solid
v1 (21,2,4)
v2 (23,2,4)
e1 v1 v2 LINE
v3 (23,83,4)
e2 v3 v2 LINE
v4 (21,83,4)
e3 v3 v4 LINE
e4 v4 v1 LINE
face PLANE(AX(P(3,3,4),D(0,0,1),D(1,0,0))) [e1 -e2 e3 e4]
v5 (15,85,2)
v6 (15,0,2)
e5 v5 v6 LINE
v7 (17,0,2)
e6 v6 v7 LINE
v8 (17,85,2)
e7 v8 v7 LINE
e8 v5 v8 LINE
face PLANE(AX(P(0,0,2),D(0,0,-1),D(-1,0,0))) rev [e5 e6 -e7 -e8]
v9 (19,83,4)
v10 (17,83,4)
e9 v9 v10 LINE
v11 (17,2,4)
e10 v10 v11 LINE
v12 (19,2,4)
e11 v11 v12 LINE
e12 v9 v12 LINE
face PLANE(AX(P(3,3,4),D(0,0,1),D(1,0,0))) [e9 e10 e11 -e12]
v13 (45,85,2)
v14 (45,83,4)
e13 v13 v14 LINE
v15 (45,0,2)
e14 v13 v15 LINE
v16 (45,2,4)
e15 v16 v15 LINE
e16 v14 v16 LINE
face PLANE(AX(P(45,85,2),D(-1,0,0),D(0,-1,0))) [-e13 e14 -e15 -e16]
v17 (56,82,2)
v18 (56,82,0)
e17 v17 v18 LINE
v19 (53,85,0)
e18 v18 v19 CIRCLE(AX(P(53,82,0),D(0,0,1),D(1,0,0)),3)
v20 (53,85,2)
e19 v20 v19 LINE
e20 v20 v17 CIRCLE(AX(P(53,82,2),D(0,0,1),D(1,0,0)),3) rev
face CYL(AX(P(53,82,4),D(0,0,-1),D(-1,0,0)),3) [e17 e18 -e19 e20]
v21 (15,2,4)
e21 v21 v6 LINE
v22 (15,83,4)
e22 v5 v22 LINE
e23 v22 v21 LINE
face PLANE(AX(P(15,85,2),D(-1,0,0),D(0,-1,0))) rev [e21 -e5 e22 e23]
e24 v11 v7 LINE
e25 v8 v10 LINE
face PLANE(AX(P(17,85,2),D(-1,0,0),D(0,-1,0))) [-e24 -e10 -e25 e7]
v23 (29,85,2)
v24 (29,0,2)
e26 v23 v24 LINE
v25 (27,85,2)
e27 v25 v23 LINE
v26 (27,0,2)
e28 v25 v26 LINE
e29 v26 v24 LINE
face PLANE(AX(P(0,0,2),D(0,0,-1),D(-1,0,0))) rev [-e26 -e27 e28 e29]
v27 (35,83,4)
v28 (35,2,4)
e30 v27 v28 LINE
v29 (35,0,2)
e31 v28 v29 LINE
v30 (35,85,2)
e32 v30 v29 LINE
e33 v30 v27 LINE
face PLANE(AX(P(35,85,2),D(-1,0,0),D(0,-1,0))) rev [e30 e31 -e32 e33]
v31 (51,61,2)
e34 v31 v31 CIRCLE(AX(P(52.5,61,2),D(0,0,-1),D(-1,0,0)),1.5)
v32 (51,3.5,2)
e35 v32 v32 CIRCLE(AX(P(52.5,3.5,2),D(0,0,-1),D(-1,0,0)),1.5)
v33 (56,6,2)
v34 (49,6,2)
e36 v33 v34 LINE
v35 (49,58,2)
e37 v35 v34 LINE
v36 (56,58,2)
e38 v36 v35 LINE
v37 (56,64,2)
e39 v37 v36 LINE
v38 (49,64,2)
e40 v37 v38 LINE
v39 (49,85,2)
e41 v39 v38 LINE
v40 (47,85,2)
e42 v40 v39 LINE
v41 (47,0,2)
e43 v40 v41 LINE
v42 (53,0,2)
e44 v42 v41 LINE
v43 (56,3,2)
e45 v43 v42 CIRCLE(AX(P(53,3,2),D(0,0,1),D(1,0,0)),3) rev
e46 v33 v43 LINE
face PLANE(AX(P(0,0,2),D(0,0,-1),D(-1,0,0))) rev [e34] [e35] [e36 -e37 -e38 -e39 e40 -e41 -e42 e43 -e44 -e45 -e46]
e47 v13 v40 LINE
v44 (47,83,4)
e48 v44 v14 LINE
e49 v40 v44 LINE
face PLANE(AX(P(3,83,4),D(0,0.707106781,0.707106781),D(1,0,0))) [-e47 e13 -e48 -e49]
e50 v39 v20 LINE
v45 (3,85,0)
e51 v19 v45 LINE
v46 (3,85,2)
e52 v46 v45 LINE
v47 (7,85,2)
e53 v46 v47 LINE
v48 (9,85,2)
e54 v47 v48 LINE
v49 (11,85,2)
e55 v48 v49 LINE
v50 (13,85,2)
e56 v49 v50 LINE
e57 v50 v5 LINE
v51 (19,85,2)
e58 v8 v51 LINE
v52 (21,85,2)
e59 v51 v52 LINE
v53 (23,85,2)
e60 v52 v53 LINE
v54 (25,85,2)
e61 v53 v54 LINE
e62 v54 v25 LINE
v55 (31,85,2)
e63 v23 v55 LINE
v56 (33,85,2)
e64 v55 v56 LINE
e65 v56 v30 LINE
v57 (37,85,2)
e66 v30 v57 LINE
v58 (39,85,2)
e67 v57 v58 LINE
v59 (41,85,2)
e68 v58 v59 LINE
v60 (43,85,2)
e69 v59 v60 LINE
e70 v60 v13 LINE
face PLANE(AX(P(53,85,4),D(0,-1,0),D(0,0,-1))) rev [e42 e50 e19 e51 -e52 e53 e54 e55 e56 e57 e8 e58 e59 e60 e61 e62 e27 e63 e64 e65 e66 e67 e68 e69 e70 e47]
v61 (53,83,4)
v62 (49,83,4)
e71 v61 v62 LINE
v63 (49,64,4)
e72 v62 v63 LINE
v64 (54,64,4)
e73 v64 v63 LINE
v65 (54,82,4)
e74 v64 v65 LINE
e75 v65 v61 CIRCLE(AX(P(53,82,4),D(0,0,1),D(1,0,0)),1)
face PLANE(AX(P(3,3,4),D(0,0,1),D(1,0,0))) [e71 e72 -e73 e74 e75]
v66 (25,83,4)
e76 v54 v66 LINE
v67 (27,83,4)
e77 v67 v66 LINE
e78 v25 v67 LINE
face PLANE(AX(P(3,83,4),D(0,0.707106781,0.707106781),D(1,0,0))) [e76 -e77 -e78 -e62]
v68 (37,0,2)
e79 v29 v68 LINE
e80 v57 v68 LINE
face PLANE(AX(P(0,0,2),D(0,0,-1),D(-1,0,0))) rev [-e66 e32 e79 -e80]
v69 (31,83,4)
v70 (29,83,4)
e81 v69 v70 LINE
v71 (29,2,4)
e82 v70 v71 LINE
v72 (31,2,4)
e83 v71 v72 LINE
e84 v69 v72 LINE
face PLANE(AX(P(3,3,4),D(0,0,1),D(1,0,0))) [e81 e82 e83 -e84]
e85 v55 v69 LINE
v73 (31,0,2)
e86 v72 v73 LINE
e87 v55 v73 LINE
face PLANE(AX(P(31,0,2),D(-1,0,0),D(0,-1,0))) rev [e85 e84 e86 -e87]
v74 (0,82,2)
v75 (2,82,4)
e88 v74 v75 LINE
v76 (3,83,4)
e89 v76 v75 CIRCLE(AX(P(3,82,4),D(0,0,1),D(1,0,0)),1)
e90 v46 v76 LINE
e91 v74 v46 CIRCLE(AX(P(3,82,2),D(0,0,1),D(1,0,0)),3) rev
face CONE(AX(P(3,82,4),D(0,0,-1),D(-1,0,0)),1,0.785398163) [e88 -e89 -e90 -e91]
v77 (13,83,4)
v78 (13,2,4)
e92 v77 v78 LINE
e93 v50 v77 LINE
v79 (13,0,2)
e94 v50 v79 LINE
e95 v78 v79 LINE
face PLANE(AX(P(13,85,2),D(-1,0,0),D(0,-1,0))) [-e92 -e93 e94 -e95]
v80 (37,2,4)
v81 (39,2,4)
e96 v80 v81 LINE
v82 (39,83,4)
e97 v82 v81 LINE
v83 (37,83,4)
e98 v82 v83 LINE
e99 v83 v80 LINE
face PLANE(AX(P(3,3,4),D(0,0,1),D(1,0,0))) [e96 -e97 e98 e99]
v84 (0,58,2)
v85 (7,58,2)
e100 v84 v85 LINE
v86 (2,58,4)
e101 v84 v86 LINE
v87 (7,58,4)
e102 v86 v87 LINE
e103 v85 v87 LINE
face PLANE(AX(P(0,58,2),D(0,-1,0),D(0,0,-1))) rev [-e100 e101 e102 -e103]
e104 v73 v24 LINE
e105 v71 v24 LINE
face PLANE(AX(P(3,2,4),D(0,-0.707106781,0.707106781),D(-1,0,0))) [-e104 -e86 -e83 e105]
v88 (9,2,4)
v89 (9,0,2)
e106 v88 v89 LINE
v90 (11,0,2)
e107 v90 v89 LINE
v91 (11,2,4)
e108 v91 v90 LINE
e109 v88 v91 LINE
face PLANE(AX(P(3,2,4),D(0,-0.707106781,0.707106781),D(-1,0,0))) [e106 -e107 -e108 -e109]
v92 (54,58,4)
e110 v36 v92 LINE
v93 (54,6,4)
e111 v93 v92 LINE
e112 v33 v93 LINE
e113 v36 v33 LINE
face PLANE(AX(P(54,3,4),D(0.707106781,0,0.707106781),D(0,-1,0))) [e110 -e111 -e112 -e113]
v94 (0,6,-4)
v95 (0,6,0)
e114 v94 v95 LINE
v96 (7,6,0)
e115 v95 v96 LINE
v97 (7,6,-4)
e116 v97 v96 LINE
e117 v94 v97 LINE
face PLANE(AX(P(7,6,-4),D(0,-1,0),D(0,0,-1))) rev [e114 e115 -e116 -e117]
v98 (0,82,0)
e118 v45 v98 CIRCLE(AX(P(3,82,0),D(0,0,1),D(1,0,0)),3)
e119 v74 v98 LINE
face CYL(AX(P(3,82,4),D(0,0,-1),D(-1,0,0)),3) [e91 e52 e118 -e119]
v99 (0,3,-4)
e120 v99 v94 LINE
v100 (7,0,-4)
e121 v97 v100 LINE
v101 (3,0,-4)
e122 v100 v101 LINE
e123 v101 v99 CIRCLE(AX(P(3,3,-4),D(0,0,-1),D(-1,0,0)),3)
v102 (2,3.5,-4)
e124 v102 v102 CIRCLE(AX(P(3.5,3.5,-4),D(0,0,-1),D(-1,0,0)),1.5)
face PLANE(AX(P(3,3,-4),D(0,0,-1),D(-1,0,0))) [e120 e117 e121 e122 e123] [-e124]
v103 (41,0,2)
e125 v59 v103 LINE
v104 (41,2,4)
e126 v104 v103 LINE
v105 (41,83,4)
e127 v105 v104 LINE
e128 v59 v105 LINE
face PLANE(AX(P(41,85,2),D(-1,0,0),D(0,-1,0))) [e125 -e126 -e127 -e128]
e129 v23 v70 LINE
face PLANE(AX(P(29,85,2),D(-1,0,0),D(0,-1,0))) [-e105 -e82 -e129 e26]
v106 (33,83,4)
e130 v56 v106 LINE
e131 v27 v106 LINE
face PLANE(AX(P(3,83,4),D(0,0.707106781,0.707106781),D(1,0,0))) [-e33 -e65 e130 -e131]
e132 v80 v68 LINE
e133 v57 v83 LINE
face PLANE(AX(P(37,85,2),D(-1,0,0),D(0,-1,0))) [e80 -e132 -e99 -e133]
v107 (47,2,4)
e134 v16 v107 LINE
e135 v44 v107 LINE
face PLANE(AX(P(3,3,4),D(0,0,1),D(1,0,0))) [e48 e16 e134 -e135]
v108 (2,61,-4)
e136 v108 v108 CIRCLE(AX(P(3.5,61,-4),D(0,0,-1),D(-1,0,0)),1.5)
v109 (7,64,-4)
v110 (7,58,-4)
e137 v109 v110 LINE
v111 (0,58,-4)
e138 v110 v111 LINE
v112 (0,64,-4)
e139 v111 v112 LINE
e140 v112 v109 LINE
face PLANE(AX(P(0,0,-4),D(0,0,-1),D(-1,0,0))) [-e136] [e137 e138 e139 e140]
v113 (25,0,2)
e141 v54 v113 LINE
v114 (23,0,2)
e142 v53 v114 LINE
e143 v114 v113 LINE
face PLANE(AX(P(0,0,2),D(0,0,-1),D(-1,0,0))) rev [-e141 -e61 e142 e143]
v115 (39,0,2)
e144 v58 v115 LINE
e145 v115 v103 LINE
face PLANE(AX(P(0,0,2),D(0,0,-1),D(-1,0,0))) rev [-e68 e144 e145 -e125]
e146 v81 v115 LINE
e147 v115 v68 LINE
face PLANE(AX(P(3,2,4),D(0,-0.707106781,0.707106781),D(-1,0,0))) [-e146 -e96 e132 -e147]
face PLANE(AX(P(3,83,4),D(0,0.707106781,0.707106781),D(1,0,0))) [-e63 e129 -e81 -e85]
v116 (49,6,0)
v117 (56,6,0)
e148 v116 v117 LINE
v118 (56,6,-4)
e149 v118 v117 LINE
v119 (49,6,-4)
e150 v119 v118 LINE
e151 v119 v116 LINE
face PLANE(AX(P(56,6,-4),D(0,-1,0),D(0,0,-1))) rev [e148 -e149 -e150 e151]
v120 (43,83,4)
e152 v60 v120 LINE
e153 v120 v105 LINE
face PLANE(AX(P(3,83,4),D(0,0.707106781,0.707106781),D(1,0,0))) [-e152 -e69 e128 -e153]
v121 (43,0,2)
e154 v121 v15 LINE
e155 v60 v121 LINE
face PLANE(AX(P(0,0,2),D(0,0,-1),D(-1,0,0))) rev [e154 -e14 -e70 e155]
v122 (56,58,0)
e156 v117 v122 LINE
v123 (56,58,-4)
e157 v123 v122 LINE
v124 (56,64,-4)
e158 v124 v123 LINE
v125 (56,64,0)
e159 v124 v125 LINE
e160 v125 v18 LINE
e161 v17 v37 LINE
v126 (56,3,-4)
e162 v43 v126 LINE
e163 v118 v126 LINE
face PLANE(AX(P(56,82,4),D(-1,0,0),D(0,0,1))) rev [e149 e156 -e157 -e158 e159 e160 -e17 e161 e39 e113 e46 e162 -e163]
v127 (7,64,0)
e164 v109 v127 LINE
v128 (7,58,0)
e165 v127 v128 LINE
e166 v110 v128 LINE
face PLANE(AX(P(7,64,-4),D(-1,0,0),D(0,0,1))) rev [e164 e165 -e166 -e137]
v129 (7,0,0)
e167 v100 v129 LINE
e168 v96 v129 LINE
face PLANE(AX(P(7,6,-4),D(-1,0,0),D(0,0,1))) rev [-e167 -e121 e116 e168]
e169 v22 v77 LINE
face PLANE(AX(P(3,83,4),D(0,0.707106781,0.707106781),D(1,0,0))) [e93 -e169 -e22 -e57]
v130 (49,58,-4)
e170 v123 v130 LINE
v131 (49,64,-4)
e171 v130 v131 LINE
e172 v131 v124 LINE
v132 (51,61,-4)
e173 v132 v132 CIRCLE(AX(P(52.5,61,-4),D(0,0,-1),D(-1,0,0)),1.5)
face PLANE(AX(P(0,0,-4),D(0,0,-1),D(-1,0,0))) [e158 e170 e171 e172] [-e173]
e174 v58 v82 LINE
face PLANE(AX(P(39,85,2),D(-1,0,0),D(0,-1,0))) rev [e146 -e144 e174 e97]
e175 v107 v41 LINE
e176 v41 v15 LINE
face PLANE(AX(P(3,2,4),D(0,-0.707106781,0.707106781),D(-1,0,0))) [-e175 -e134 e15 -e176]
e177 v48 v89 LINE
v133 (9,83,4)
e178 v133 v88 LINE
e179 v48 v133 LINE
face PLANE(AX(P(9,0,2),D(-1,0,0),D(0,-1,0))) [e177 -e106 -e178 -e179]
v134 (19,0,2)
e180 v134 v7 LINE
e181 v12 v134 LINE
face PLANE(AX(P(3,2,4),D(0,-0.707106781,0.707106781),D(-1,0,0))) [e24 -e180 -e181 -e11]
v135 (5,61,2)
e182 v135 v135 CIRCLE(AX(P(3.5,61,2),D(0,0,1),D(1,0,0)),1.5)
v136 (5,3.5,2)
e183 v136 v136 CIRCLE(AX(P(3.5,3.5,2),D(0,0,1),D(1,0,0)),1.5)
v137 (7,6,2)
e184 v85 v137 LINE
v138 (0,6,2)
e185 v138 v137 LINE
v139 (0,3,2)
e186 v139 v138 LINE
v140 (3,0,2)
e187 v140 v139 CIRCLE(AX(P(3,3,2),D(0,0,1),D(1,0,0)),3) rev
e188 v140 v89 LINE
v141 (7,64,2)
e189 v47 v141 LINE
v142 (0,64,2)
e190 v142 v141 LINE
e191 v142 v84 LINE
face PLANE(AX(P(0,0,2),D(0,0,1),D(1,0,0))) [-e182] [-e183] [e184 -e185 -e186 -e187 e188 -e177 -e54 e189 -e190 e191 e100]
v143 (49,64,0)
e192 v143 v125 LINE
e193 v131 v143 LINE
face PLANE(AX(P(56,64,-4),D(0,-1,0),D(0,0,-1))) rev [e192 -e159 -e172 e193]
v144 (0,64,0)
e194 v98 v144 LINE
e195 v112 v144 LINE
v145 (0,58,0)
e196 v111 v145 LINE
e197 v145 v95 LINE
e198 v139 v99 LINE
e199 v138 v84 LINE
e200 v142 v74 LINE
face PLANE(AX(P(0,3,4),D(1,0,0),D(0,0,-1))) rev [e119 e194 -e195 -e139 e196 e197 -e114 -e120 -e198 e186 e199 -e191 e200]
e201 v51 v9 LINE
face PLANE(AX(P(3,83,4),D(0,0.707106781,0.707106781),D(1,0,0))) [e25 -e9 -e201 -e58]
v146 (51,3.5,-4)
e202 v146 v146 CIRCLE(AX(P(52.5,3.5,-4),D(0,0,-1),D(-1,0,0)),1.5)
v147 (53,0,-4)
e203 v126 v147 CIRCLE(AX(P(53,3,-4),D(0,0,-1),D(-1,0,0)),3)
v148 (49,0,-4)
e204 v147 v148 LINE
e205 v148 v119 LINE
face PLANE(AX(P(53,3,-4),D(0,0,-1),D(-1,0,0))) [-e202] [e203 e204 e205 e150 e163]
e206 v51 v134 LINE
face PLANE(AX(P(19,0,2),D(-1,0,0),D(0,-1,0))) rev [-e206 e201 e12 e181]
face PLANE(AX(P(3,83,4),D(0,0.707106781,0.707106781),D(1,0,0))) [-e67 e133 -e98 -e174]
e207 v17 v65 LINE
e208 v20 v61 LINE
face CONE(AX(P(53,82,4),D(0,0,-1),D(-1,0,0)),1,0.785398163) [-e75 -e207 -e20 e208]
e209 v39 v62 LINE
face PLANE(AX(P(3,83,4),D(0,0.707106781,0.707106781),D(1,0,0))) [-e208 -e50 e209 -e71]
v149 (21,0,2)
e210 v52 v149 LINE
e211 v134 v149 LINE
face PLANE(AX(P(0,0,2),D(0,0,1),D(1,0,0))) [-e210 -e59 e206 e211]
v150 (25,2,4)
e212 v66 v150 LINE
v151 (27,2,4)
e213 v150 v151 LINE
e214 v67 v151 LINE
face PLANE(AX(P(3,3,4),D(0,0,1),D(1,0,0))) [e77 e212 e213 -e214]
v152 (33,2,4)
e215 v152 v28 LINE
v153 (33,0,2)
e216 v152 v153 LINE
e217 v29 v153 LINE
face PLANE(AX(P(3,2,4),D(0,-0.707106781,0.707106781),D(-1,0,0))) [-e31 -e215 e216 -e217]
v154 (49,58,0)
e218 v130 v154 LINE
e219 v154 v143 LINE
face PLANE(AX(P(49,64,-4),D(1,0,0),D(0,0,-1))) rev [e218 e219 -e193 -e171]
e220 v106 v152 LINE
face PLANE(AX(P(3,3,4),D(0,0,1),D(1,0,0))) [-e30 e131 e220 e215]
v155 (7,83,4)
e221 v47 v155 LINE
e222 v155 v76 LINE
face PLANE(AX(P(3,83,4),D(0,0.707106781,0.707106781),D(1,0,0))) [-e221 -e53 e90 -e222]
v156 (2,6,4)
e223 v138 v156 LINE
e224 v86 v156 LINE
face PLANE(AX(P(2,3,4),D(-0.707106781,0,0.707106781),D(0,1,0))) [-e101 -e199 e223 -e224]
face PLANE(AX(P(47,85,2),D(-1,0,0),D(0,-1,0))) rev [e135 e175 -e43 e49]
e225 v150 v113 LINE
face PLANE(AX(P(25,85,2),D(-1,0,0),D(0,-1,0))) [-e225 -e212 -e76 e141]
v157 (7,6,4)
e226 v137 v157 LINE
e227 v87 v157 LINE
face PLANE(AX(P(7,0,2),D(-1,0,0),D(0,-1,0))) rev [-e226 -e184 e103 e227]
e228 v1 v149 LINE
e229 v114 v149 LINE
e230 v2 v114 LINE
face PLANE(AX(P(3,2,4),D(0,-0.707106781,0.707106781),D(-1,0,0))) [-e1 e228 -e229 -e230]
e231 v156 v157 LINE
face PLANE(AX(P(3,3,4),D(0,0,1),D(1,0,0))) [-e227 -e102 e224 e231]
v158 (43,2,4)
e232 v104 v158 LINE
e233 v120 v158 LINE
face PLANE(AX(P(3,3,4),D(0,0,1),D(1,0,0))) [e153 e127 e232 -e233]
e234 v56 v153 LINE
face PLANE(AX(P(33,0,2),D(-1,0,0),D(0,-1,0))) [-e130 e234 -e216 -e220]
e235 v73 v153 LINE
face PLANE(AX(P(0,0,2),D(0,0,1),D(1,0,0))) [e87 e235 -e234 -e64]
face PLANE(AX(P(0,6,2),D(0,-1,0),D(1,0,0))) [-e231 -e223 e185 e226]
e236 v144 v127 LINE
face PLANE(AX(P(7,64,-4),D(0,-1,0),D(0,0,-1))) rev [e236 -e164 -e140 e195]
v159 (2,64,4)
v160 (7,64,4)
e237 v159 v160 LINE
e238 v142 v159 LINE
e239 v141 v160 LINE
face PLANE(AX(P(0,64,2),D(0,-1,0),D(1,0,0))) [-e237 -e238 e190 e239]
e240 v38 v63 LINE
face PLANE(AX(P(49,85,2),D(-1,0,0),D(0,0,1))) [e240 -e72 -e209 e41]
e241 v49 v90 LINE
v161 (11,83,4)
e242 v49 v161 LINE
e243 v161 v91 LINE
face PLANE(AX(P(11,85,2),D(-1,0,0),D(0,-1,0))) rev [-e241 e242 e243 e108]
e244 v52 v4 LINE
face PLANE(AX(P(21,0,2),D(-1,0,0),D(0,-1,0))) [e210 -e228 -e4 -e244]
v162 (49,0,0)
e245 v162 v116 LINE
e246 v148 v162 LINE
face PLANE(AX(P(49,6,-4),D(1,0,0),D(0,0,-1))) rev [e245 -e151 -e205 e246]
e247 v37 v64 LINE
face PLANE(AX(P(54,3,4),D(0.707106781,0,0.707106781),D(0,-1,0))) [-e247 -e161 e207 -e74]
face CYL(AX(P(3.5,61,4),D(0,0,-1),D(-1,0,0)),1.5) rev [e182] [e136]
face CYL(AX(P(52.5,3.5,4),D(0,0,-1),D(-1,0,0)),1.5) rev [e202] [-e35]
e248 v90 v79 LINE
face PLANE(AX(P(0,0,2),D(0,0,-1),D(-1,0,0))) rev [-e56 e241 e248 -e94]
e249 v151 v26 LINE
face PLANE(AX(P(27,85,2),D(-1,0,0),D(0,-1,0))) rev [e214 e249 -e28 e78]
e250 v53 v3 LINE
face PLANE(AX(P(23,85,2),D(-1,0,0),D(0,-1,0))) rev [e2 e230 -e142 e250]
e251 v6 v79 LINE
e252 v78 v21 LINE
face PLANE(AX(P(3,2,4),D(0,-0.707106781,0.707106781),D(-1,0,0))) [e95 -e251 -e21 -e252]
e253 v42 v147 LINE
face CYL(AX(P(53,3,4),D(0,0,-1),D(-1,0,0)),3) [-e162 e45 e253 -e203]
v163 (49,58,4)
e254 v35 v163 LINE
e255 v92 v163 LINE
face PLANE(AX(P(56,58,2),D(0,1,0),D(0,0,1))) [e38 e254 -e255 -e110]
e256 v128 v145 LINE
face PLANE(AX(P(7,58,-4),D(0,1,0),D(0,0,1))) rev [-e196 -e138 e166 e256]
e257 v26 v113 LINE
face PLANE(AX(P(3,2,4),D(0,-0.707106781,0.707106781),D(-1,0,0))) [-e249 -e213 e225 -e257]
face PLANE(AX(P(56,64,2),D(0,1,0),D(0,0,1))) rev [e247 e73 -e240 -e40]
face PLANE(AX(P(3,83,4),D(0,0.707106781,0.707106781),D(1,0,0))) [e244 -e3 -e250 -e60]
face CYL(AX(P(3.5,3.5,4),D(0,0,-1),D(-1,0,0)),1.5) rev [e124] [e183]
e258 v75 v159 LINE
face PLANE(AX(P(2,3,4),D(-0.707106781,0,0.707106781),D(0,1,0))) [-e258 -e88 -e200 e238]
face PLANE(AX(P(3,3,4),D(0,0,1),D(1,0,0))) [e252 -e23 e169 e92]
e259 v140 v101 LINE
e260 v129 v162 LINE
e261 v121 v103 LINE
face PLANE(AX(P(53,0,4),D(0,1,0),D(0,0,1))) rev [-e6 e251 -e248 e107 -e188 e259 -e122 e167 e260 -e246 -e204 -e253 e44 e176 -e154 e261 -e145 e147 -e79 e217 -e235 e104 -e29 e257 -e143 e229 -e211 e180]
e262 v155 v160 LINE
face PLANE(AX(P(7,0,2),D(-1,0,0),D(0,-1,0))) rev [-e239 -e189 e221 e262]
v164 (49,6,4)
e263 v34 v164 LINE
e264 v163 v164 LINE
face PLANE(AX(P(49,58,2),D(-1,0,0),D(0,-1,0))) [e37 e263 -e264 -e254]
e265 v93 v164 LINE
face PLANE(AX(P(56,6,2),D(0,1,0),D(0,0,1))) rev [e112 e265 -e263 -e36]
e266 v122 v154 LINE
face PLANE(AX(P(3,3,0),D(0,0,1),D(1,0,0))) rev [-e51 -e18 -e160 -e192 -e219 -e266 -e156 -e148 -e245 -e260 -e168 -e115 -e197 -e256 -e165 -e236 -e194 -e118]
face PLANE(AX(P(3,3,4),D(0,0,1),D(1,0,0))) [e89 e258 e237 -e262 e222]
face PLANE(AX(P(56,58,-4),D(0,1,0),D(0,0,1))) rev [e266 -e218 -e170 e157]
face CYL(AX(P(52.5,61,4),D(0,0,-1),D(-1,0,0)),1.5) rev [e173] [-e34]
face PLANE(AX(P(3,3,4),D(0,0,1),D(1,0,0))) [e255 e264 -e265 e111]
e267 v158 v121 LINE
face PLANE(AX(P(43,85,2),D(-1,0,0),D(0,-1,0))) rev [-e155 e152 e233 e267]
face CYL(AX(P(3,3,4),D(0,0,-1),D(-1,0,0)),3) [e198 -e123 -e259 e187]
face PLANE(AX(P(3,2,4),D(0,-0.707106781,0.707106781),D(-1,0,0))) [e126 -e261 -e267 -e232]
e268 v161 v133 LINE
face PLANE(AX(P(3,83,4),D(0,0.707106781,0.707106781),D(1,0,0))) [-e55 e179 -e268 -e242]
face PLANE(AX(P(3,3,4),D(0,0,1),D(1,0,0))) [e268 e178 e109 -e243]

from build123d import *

# Parameters (mm, degrees)
SKETCH_4_R          = 1.5
EXTRUDE_1_DEPTH     = 4
CHAMFER_1_SIZE      = 2
SKETCH_5_W          = 2
SKETCH_5_H          = 85
CUT_EXTRUDE_1_DEPTH = 2
EXTRUDE_START       = 4
SKETCH_6_W          = 7
SKETCH_6_H          = 6
SKETCH_6_R          = 1.5
EXTRUDE_2_DEPTH     = 4


with BuildPart() as part:
    # 草图4 → 凸台-拉伸1 (new body)
    with BuildSketch(Plane.XY):
        with BuildLine():
            Line((0, 3), (0, 82))
            ThreePointArc((0, 82), (0.878679656, 84.121320344), (3, 85))
            Line((3, 85), (53, 85))
            ThreePointArc((53, 85), (55.121320344, 84.121320344), (56, 82))
            Line((56, 82), (56, 3))
            ThreePointArc((56, 3), (55.121320344, 0.878679656), (53, 0))
            Line((53, 0), (3, 0))
            ThreePointArc((3, 0), (0.878679656, 0.878679656), (0, 3))
        make_face()
        with Locations((3.5, 3.5)):
            Circle(SKETCH_4_R, mode=Mode.SUBTRACT)
        with Locations((52.5, 3.5)):
            Circle(SKETCH_4_R, mode=Mode.SUBTRACT)
        with Locations((52.5, 61)):
            Circle(SKETCH_4_R, mode=Mode.SUBTRACT)
        with Locations((3.5, 61)):
            Circle(SKETCH_4_R, mode=Mode.SUBTRACT)
    extrude(amount=EXTRUDE_1_DEPTH)

    # 倒角1
    chamfer_1_edges = [part.edges().sort_by_distance(p)[0] for p in [
        (55.121320344, 0.878679656, 4),
        (56, 42.5, 4),
        (55.121320344, 84.121320344, 4),
        (28, 85, 4),
        (0.878679656, 84.121320344, 4),
        (0, 42.5, 4),
        (0.878679656, 0.878679656, 4),
        (28, 0, 4),
    ]]
    chamfer(chamfer_1_edges, length=CHAMFER_1_SIZE - 0.0001)  # a hair under: the kernel refuses the full size

    # 草图5 → 切除-拉伸1 (cut)
    with BuildSketch(Plane.XY.offset(4)):
        Polygon((7, 64), (0, 64), (0, 58), (7, 58), (7, 6), (0, 6), (0, 0), (9, 0), (9, 85), (7, 85), align=None)
        Polygon((49, 58), (56, 58), (56, 64), (49, 64), (49, 85), (47, 85), (47, 0), (56, 0), (56, 6), (49, 6), align=None)
        with Locations((12, 42.5)):
            Rectangle(SKETCH_5_W, SKETCH_5_H)
        with Locations((16, 42.5)):
            Rectangle(SKETCH_5_W, SKETCH_5_H)
        with Locations((20, 42.5)):
            Rectangle(SKETCH_5_W, SKETCH_5_H)
        with Locations((24, 42.5)):
            Rectangle(SKETCH_5_W, SKETCH_5_H)
        with Locations((28, 42.5)):
            Rectangle(SKETCH_5_W, SKETCH_5_H)
        with Locations((32, 42.5)):
            Rectangle(SKETCH_5_W, SKETCH_5_H)
        with Locations((36, 42.5)):
            Rectangle(SKETCH_5_W, SKETCH_5_H)
        with Locations((40, 42.5)):
            Rectangle(SKETCH_5_W, SKETCH_5_H)
        with Locations((44, 42.5)):
            Rectangle(SKETCH_5_W, SKETCH_5_H)
    extrude(amount=-CUT_EXTRUDE_1_DEPTH, mode=Mode.SUBTRACT)

    # 草图6 → 凸台-拉伸2 (add)
    # profile 1 of 4: a face of its own
    with BuildSketch(Plane(origin=(0, 0, 0), x_dir=(-1, 0, 0), z_dir=(0, 0, -1)).offset(EXTRUDE_START)):
        with Locations((-52.5, 61)):
            Rectangle(SKETCH_6_W, SKETCH_6_H)
        with Locations((-52.5, 61)):
            Circle(SKETCH_6_R, mode=Mode.SUBTRACT)
    # profile 2 of 4: a face of its own
    with BuildSketch(Plane(origin=(0, 0, 0), x_dir=(-1, 0, 0), z_dir=(0, 0, -1)).offset(EXTRUDE_START)):
        with BuildLine():
            Line((-56, 6), (-49, 6))
            Line((-49, 6), (-49, 0))
            Line((-49, 0), (-53, 0))
            ThreePointArc((-53, 0), (-55.121320344, 0.878679656), (-56, 3))
            Line((-56, 3), (-56, 6))
        make_face()
        with Locations((-52.5, 3.5)):
            Circle(SKETCH_6_R, mode=Mode.SUBTRACT)
    # profile 3 of 4: a face of its own
    with BuildSketch(Plane(origin=(0, 0, 0), x_dir=(-1, 0, 0), z_dir=(0, 0, -1)).offset(EXTRUDE_START)):
        with BuildLine():
            Line((-7, 6), (0, 6))
            Line((0, 6), (0, 3))
            ThreePointArc((0, 3), (-0.878679656, 0.878679656), (-3, 0))
            Line((-3, 0), (-7, 0))
            Line((-7, 0), (-7, 6))
        make_face()
        with Locations((-3.5, 3.5)):
            Circle(SKETCH_6_R, mode=Mode.SUBTRACT)
    # profile 4 of 4: a face of its own
    with BuildSketch(Plane(origin=(0, 0, 0), x_dir=(-1, 0, 0), z_dir=(0, 0, -1)).offset(EXTRUDE_START)):
        with Locations((-3.5, 61)):
            Rectangle(SKETCH_6_W, SKETCH_6_H)
        with Locations((-3.5, 61)):
            Circle(SKETCH_6_R, mode=Mode.SUBTRACT)
    extrude(amount=-EXTRUDE_2_DEPTH)


solid = part.part
